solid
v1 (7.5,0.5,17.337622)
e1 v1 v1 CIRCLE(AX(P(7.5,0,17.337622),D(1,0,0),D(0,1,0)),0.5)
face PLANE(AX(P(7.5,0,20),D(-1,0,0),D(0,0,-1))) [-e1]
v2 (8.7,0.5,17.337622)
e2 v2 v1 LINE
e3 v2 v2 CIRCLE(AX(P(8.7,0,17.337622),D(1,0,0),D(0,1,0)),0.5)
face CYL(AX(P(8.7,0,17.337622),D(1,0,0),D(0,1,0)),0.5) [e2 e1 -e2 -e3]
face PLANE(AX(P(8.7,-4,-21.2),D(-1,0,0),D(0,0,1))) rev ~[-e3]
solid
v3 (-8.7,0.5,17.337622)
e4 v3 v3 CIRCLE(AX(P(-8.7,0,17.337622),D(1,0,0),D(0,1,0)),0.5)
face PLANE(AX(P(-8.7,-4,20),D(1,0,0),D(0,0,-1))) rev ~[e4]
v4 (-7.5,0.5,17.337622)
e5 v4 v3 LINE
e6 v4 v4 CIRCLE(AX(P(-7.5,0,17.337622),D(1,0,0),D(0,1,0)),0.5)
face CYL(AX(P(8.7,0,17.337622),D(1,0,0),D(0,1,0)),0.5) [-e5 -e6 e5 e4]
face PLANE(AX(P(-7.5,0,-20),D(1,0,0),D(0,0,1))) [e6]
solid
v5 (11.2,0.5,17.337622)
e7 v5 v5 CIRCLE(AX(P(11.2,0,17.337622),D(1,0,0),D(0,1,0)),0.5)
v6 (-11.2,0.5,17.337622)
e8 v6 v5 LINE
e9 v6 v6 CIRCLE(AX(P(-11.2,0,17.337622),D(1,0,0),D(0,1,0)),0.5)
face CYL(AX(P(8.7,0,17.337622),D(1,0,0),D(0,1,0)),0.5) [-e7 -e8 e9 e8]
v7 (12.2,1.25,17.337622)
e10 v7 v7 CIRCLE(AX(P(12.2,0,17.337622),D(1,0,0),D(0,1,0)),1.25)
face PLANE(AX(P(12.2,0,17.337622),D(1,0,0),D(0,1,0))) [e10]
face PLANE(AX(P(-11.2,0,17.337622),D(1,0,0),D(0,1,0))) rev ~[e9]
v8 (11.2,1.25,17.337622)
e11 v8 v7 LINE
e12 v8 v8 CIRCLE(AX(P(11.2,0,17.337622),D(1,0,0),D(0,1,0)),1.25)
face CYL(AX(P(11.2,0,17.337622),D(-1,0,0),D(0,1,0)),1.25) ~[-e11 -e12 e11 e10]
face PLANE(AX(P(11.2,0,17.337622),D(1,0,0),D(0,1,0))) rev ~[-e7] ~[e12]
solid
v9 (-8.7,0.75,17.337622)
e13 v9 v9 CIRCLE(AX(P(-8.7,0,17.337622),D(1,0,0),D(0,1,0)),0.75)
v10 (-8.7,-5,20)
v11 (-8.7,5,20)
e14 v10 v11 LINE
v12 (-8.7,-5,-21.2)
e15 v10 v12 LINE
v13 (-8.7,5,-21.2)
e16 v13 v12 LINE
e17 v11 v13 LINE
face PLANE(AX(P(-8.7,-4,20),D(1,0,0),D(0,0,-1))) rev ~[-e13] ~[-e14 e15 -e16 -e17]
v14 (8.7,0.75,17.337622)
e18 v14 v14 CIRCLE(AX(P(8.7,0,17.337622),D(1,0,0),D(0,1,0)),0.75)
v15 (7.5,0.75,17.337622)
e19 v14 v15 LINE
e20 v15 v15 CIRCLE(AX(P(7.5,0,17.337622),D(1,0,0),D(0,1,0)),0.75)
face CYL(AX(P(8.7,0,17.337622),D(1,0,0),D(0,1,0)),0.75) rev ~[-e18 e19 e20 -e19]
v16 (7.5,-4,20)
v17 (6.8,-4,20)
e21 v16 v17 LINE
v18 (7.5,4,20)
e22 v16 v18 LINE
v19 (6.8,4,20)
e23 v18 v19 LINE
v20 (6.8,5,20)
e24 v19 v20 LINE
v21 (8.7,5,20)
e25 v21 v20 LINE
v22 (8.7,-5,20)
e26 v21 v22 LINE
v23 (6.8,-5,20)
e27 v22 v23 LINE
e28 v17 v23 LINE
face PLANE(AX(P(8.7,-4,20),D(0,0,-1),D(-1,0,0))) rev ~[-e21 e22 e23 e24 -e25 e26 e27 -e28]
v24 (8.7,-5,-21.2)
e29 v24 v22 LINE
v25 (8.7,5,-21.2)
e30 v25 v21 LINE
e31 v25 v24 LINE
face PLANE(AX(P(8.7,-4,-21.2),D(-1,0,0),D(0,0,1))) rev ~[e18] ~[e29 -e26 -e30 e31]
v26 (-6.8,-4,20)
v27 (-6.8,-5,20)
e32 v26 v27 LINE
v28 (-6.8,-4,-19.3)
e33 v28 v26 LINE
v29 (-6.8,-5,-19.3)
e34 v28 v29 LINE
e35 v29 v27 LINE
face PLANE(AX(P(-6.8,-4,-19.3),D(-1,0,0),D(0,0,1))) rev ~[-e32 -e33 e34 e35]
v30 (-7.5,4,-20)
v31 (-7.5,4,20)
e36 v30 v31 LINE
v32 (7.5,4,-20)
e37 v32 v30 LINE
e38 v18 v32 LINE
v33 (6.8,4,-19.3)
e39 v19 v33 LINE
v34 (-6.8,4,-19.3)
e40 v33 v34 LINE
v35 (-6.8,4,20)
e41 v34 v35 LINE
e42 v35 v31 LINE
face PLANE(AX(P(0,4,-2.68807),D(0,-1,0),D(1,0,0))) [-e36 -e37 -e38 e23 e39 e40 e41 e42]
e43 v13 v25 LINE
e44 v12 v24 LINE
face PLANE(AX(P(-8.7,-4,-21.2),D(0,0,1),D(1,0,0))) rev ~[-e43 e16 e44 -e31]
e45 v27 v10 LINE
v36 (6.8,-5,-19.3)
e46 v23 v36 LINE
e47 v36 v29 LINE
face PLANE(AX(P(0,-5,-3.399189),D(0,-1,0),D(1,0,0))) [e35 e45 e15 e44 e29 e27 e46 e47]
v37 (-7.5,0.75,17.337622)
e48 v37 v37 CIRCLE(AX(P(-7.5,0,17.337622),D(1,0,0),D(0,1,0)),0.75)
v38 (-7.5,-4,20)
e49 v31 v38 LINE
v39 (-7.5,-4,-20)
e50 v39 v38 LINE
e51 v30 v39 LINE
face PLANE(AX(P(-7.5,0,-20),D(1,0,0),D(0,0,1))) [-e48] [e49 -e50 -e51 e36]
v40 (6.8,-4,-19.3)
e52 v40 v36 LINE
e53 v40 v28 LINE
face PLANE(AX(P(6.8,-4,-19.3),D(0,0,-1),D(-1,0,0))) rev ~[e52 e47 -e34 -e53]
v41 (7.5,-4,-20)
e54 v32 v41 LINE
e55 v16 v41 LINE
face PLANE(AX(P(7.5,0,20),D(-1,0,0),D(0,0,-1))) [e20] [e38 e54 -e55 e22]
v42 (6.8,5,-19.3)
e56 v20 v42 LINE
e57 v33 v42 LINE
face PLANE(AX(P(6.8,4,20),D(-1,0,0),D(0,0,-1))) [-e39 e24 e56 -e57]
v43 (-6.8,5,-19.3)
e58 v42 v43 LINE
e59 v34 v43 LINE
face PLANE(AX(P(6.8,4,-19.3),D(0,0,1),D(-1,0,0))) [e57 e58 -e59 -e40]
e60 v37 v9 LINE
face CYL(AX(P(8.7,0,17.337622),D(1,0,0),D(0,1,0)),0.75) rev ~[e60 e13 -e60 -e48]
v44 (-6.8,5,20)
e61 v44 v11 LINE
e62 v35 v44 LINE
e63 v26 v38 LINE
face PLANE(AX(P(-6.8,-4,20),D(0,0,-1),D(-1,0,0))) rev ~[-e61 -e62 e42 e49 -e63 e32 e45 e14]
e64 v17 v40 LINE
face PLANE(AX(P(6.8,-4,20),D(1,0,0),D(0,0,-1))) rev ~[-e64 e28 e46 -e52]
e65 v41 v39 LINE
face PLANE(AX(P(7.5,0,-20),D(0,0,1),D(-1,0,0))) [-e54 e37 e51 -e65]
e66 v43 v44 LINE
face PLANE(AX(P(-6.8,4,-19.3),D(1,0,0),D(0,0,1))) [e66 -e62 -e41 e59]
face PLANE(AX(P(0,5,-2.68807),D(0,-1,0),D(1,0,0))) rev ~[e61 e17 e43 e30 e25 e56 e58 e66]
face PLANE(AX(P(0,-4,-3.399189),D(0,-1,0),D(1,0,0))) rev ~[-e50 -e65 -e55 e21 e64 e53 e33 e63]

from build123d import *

# Parameters (mm, degrees)
F1_DEPTH      = 4
F1_DEPTH_BACK = 4
F2_START      = -4
F2_DEPTH      = 1
F3_START      = 4
F3_DEPTH      = 1
F4_R          = 0.75
F4_R_2        = 0.5
F5_DEPTH      = 25
F6_DEPTH      = 2.5
F6_DEPTH_BACK = 19.9
F7_START      = 2.5
F4_R_3        = 1.25
F7_DEPTH      = 1


# Not quite as in the source:
# - a feature names something its author has since deleted; it is built from what else it names


with BuildPart() as f1:
    # F0 (on Front) → F1 (new body, two sides)
    with BuildSketch(Plane.XZ) as f1_sk:
        Polygon((7.5, 20), (7.5, -20), (-7.5, -20), (-7.5, 20), (-8.7, 20), (-8.7, -21.2), (8.7, -21.2), (8.7, 20), align=None)
    extrude(amount=F1_DEPTH)
    extrude(f1_sk.sketch, amount=-F1_DEPTH_BACK)

    # F0 (on Front) → F2 (join)
    with BuildSketch(Plane.XZ.offset(F2_START)):
        Polygon((-7.5, -20), (7.5, -20), (7.5, 20), (6.8, 20), (6.8, -19.3), (-6.8, -19.3), (-6.8, 20), (-7.5, 20), align=None)
        Polygon((7.5, 20), (7.5, -20), (-7.5, -20), (-7.5, 20), (-8.7, 20), (-8.7, -21.2), (8.7, -21.2), (8.7, 20), align=None)
    extrude(amount=-F2_DEPTH)

    # F0 (on Front) → F3 (join)
    with BuildSketch(Plane.XZ.offset(F3_START)):
        Polygon((7.5, 20), (7.5, -20), (-7.5, -20), (-7.5, 20), (-8.7, 20), (-8.7, -21.2), (8.7, -21.2), (8.7, 20), align=None)
        Polygon((-7.5, -20), (7.5, -20), (7.5, 20), (6.8, 20), (6.8, -19.3), (-6.8, -19.3), (-6.8, 20), (-7.5, 20), align=None)
    extrude(amount=F3_DEPTH)

    # F4 (on face) → F5 (cut)
    with BuildSketch(Plane.YZ.offset(8.7)):
        with Locations((0, 17.3376215611)):
            Circle(F4_R)
        with Locations((0, 17.3376215611)):
            Circle(F4_R_2, mode=Mode.SUBTRACT)
    extrude(amount=-F5_DEPTH, mode=Mode.SUBTRACT)


with BuildPart() as f6:
    # F4 (on face) → F6 (new body, two sides)
    with BuildSketch(Plane.YZ.offset(8.7)) as f6_sk:
        with Locations((0, 17.3376215611)):
            Circle(F4_R_2)
    extrude(amount=F6_DEPTH)
    extrude(f6_sk.sketch, amount=-F6_DEPTH_BACK)

    # F4 (on face) → F7 (join)
    with BuildSketch(Plane.YZ.offset(8.7).offset(F7_START)):
        with Locations((0, 17.3376215611)):
            Circle(F4_R_3)
        with Locations((0, 17.3376215611)):
            Circle(F4_R, mode=Mode.SUBTRACT)
        with Locations((0, 17.3376215611)):
            Circle(F4_R)
        with Locations((0, 17.3376215611)):
            Circle(F4_R_2, mode=Mode.SUBTRACT)
        with Locations((0, 17.3376215611)):
            Circle(F4_R_2)
    extrude(amount=F7_DEPTH)


solid = Compound([f1.part, f6.part])
